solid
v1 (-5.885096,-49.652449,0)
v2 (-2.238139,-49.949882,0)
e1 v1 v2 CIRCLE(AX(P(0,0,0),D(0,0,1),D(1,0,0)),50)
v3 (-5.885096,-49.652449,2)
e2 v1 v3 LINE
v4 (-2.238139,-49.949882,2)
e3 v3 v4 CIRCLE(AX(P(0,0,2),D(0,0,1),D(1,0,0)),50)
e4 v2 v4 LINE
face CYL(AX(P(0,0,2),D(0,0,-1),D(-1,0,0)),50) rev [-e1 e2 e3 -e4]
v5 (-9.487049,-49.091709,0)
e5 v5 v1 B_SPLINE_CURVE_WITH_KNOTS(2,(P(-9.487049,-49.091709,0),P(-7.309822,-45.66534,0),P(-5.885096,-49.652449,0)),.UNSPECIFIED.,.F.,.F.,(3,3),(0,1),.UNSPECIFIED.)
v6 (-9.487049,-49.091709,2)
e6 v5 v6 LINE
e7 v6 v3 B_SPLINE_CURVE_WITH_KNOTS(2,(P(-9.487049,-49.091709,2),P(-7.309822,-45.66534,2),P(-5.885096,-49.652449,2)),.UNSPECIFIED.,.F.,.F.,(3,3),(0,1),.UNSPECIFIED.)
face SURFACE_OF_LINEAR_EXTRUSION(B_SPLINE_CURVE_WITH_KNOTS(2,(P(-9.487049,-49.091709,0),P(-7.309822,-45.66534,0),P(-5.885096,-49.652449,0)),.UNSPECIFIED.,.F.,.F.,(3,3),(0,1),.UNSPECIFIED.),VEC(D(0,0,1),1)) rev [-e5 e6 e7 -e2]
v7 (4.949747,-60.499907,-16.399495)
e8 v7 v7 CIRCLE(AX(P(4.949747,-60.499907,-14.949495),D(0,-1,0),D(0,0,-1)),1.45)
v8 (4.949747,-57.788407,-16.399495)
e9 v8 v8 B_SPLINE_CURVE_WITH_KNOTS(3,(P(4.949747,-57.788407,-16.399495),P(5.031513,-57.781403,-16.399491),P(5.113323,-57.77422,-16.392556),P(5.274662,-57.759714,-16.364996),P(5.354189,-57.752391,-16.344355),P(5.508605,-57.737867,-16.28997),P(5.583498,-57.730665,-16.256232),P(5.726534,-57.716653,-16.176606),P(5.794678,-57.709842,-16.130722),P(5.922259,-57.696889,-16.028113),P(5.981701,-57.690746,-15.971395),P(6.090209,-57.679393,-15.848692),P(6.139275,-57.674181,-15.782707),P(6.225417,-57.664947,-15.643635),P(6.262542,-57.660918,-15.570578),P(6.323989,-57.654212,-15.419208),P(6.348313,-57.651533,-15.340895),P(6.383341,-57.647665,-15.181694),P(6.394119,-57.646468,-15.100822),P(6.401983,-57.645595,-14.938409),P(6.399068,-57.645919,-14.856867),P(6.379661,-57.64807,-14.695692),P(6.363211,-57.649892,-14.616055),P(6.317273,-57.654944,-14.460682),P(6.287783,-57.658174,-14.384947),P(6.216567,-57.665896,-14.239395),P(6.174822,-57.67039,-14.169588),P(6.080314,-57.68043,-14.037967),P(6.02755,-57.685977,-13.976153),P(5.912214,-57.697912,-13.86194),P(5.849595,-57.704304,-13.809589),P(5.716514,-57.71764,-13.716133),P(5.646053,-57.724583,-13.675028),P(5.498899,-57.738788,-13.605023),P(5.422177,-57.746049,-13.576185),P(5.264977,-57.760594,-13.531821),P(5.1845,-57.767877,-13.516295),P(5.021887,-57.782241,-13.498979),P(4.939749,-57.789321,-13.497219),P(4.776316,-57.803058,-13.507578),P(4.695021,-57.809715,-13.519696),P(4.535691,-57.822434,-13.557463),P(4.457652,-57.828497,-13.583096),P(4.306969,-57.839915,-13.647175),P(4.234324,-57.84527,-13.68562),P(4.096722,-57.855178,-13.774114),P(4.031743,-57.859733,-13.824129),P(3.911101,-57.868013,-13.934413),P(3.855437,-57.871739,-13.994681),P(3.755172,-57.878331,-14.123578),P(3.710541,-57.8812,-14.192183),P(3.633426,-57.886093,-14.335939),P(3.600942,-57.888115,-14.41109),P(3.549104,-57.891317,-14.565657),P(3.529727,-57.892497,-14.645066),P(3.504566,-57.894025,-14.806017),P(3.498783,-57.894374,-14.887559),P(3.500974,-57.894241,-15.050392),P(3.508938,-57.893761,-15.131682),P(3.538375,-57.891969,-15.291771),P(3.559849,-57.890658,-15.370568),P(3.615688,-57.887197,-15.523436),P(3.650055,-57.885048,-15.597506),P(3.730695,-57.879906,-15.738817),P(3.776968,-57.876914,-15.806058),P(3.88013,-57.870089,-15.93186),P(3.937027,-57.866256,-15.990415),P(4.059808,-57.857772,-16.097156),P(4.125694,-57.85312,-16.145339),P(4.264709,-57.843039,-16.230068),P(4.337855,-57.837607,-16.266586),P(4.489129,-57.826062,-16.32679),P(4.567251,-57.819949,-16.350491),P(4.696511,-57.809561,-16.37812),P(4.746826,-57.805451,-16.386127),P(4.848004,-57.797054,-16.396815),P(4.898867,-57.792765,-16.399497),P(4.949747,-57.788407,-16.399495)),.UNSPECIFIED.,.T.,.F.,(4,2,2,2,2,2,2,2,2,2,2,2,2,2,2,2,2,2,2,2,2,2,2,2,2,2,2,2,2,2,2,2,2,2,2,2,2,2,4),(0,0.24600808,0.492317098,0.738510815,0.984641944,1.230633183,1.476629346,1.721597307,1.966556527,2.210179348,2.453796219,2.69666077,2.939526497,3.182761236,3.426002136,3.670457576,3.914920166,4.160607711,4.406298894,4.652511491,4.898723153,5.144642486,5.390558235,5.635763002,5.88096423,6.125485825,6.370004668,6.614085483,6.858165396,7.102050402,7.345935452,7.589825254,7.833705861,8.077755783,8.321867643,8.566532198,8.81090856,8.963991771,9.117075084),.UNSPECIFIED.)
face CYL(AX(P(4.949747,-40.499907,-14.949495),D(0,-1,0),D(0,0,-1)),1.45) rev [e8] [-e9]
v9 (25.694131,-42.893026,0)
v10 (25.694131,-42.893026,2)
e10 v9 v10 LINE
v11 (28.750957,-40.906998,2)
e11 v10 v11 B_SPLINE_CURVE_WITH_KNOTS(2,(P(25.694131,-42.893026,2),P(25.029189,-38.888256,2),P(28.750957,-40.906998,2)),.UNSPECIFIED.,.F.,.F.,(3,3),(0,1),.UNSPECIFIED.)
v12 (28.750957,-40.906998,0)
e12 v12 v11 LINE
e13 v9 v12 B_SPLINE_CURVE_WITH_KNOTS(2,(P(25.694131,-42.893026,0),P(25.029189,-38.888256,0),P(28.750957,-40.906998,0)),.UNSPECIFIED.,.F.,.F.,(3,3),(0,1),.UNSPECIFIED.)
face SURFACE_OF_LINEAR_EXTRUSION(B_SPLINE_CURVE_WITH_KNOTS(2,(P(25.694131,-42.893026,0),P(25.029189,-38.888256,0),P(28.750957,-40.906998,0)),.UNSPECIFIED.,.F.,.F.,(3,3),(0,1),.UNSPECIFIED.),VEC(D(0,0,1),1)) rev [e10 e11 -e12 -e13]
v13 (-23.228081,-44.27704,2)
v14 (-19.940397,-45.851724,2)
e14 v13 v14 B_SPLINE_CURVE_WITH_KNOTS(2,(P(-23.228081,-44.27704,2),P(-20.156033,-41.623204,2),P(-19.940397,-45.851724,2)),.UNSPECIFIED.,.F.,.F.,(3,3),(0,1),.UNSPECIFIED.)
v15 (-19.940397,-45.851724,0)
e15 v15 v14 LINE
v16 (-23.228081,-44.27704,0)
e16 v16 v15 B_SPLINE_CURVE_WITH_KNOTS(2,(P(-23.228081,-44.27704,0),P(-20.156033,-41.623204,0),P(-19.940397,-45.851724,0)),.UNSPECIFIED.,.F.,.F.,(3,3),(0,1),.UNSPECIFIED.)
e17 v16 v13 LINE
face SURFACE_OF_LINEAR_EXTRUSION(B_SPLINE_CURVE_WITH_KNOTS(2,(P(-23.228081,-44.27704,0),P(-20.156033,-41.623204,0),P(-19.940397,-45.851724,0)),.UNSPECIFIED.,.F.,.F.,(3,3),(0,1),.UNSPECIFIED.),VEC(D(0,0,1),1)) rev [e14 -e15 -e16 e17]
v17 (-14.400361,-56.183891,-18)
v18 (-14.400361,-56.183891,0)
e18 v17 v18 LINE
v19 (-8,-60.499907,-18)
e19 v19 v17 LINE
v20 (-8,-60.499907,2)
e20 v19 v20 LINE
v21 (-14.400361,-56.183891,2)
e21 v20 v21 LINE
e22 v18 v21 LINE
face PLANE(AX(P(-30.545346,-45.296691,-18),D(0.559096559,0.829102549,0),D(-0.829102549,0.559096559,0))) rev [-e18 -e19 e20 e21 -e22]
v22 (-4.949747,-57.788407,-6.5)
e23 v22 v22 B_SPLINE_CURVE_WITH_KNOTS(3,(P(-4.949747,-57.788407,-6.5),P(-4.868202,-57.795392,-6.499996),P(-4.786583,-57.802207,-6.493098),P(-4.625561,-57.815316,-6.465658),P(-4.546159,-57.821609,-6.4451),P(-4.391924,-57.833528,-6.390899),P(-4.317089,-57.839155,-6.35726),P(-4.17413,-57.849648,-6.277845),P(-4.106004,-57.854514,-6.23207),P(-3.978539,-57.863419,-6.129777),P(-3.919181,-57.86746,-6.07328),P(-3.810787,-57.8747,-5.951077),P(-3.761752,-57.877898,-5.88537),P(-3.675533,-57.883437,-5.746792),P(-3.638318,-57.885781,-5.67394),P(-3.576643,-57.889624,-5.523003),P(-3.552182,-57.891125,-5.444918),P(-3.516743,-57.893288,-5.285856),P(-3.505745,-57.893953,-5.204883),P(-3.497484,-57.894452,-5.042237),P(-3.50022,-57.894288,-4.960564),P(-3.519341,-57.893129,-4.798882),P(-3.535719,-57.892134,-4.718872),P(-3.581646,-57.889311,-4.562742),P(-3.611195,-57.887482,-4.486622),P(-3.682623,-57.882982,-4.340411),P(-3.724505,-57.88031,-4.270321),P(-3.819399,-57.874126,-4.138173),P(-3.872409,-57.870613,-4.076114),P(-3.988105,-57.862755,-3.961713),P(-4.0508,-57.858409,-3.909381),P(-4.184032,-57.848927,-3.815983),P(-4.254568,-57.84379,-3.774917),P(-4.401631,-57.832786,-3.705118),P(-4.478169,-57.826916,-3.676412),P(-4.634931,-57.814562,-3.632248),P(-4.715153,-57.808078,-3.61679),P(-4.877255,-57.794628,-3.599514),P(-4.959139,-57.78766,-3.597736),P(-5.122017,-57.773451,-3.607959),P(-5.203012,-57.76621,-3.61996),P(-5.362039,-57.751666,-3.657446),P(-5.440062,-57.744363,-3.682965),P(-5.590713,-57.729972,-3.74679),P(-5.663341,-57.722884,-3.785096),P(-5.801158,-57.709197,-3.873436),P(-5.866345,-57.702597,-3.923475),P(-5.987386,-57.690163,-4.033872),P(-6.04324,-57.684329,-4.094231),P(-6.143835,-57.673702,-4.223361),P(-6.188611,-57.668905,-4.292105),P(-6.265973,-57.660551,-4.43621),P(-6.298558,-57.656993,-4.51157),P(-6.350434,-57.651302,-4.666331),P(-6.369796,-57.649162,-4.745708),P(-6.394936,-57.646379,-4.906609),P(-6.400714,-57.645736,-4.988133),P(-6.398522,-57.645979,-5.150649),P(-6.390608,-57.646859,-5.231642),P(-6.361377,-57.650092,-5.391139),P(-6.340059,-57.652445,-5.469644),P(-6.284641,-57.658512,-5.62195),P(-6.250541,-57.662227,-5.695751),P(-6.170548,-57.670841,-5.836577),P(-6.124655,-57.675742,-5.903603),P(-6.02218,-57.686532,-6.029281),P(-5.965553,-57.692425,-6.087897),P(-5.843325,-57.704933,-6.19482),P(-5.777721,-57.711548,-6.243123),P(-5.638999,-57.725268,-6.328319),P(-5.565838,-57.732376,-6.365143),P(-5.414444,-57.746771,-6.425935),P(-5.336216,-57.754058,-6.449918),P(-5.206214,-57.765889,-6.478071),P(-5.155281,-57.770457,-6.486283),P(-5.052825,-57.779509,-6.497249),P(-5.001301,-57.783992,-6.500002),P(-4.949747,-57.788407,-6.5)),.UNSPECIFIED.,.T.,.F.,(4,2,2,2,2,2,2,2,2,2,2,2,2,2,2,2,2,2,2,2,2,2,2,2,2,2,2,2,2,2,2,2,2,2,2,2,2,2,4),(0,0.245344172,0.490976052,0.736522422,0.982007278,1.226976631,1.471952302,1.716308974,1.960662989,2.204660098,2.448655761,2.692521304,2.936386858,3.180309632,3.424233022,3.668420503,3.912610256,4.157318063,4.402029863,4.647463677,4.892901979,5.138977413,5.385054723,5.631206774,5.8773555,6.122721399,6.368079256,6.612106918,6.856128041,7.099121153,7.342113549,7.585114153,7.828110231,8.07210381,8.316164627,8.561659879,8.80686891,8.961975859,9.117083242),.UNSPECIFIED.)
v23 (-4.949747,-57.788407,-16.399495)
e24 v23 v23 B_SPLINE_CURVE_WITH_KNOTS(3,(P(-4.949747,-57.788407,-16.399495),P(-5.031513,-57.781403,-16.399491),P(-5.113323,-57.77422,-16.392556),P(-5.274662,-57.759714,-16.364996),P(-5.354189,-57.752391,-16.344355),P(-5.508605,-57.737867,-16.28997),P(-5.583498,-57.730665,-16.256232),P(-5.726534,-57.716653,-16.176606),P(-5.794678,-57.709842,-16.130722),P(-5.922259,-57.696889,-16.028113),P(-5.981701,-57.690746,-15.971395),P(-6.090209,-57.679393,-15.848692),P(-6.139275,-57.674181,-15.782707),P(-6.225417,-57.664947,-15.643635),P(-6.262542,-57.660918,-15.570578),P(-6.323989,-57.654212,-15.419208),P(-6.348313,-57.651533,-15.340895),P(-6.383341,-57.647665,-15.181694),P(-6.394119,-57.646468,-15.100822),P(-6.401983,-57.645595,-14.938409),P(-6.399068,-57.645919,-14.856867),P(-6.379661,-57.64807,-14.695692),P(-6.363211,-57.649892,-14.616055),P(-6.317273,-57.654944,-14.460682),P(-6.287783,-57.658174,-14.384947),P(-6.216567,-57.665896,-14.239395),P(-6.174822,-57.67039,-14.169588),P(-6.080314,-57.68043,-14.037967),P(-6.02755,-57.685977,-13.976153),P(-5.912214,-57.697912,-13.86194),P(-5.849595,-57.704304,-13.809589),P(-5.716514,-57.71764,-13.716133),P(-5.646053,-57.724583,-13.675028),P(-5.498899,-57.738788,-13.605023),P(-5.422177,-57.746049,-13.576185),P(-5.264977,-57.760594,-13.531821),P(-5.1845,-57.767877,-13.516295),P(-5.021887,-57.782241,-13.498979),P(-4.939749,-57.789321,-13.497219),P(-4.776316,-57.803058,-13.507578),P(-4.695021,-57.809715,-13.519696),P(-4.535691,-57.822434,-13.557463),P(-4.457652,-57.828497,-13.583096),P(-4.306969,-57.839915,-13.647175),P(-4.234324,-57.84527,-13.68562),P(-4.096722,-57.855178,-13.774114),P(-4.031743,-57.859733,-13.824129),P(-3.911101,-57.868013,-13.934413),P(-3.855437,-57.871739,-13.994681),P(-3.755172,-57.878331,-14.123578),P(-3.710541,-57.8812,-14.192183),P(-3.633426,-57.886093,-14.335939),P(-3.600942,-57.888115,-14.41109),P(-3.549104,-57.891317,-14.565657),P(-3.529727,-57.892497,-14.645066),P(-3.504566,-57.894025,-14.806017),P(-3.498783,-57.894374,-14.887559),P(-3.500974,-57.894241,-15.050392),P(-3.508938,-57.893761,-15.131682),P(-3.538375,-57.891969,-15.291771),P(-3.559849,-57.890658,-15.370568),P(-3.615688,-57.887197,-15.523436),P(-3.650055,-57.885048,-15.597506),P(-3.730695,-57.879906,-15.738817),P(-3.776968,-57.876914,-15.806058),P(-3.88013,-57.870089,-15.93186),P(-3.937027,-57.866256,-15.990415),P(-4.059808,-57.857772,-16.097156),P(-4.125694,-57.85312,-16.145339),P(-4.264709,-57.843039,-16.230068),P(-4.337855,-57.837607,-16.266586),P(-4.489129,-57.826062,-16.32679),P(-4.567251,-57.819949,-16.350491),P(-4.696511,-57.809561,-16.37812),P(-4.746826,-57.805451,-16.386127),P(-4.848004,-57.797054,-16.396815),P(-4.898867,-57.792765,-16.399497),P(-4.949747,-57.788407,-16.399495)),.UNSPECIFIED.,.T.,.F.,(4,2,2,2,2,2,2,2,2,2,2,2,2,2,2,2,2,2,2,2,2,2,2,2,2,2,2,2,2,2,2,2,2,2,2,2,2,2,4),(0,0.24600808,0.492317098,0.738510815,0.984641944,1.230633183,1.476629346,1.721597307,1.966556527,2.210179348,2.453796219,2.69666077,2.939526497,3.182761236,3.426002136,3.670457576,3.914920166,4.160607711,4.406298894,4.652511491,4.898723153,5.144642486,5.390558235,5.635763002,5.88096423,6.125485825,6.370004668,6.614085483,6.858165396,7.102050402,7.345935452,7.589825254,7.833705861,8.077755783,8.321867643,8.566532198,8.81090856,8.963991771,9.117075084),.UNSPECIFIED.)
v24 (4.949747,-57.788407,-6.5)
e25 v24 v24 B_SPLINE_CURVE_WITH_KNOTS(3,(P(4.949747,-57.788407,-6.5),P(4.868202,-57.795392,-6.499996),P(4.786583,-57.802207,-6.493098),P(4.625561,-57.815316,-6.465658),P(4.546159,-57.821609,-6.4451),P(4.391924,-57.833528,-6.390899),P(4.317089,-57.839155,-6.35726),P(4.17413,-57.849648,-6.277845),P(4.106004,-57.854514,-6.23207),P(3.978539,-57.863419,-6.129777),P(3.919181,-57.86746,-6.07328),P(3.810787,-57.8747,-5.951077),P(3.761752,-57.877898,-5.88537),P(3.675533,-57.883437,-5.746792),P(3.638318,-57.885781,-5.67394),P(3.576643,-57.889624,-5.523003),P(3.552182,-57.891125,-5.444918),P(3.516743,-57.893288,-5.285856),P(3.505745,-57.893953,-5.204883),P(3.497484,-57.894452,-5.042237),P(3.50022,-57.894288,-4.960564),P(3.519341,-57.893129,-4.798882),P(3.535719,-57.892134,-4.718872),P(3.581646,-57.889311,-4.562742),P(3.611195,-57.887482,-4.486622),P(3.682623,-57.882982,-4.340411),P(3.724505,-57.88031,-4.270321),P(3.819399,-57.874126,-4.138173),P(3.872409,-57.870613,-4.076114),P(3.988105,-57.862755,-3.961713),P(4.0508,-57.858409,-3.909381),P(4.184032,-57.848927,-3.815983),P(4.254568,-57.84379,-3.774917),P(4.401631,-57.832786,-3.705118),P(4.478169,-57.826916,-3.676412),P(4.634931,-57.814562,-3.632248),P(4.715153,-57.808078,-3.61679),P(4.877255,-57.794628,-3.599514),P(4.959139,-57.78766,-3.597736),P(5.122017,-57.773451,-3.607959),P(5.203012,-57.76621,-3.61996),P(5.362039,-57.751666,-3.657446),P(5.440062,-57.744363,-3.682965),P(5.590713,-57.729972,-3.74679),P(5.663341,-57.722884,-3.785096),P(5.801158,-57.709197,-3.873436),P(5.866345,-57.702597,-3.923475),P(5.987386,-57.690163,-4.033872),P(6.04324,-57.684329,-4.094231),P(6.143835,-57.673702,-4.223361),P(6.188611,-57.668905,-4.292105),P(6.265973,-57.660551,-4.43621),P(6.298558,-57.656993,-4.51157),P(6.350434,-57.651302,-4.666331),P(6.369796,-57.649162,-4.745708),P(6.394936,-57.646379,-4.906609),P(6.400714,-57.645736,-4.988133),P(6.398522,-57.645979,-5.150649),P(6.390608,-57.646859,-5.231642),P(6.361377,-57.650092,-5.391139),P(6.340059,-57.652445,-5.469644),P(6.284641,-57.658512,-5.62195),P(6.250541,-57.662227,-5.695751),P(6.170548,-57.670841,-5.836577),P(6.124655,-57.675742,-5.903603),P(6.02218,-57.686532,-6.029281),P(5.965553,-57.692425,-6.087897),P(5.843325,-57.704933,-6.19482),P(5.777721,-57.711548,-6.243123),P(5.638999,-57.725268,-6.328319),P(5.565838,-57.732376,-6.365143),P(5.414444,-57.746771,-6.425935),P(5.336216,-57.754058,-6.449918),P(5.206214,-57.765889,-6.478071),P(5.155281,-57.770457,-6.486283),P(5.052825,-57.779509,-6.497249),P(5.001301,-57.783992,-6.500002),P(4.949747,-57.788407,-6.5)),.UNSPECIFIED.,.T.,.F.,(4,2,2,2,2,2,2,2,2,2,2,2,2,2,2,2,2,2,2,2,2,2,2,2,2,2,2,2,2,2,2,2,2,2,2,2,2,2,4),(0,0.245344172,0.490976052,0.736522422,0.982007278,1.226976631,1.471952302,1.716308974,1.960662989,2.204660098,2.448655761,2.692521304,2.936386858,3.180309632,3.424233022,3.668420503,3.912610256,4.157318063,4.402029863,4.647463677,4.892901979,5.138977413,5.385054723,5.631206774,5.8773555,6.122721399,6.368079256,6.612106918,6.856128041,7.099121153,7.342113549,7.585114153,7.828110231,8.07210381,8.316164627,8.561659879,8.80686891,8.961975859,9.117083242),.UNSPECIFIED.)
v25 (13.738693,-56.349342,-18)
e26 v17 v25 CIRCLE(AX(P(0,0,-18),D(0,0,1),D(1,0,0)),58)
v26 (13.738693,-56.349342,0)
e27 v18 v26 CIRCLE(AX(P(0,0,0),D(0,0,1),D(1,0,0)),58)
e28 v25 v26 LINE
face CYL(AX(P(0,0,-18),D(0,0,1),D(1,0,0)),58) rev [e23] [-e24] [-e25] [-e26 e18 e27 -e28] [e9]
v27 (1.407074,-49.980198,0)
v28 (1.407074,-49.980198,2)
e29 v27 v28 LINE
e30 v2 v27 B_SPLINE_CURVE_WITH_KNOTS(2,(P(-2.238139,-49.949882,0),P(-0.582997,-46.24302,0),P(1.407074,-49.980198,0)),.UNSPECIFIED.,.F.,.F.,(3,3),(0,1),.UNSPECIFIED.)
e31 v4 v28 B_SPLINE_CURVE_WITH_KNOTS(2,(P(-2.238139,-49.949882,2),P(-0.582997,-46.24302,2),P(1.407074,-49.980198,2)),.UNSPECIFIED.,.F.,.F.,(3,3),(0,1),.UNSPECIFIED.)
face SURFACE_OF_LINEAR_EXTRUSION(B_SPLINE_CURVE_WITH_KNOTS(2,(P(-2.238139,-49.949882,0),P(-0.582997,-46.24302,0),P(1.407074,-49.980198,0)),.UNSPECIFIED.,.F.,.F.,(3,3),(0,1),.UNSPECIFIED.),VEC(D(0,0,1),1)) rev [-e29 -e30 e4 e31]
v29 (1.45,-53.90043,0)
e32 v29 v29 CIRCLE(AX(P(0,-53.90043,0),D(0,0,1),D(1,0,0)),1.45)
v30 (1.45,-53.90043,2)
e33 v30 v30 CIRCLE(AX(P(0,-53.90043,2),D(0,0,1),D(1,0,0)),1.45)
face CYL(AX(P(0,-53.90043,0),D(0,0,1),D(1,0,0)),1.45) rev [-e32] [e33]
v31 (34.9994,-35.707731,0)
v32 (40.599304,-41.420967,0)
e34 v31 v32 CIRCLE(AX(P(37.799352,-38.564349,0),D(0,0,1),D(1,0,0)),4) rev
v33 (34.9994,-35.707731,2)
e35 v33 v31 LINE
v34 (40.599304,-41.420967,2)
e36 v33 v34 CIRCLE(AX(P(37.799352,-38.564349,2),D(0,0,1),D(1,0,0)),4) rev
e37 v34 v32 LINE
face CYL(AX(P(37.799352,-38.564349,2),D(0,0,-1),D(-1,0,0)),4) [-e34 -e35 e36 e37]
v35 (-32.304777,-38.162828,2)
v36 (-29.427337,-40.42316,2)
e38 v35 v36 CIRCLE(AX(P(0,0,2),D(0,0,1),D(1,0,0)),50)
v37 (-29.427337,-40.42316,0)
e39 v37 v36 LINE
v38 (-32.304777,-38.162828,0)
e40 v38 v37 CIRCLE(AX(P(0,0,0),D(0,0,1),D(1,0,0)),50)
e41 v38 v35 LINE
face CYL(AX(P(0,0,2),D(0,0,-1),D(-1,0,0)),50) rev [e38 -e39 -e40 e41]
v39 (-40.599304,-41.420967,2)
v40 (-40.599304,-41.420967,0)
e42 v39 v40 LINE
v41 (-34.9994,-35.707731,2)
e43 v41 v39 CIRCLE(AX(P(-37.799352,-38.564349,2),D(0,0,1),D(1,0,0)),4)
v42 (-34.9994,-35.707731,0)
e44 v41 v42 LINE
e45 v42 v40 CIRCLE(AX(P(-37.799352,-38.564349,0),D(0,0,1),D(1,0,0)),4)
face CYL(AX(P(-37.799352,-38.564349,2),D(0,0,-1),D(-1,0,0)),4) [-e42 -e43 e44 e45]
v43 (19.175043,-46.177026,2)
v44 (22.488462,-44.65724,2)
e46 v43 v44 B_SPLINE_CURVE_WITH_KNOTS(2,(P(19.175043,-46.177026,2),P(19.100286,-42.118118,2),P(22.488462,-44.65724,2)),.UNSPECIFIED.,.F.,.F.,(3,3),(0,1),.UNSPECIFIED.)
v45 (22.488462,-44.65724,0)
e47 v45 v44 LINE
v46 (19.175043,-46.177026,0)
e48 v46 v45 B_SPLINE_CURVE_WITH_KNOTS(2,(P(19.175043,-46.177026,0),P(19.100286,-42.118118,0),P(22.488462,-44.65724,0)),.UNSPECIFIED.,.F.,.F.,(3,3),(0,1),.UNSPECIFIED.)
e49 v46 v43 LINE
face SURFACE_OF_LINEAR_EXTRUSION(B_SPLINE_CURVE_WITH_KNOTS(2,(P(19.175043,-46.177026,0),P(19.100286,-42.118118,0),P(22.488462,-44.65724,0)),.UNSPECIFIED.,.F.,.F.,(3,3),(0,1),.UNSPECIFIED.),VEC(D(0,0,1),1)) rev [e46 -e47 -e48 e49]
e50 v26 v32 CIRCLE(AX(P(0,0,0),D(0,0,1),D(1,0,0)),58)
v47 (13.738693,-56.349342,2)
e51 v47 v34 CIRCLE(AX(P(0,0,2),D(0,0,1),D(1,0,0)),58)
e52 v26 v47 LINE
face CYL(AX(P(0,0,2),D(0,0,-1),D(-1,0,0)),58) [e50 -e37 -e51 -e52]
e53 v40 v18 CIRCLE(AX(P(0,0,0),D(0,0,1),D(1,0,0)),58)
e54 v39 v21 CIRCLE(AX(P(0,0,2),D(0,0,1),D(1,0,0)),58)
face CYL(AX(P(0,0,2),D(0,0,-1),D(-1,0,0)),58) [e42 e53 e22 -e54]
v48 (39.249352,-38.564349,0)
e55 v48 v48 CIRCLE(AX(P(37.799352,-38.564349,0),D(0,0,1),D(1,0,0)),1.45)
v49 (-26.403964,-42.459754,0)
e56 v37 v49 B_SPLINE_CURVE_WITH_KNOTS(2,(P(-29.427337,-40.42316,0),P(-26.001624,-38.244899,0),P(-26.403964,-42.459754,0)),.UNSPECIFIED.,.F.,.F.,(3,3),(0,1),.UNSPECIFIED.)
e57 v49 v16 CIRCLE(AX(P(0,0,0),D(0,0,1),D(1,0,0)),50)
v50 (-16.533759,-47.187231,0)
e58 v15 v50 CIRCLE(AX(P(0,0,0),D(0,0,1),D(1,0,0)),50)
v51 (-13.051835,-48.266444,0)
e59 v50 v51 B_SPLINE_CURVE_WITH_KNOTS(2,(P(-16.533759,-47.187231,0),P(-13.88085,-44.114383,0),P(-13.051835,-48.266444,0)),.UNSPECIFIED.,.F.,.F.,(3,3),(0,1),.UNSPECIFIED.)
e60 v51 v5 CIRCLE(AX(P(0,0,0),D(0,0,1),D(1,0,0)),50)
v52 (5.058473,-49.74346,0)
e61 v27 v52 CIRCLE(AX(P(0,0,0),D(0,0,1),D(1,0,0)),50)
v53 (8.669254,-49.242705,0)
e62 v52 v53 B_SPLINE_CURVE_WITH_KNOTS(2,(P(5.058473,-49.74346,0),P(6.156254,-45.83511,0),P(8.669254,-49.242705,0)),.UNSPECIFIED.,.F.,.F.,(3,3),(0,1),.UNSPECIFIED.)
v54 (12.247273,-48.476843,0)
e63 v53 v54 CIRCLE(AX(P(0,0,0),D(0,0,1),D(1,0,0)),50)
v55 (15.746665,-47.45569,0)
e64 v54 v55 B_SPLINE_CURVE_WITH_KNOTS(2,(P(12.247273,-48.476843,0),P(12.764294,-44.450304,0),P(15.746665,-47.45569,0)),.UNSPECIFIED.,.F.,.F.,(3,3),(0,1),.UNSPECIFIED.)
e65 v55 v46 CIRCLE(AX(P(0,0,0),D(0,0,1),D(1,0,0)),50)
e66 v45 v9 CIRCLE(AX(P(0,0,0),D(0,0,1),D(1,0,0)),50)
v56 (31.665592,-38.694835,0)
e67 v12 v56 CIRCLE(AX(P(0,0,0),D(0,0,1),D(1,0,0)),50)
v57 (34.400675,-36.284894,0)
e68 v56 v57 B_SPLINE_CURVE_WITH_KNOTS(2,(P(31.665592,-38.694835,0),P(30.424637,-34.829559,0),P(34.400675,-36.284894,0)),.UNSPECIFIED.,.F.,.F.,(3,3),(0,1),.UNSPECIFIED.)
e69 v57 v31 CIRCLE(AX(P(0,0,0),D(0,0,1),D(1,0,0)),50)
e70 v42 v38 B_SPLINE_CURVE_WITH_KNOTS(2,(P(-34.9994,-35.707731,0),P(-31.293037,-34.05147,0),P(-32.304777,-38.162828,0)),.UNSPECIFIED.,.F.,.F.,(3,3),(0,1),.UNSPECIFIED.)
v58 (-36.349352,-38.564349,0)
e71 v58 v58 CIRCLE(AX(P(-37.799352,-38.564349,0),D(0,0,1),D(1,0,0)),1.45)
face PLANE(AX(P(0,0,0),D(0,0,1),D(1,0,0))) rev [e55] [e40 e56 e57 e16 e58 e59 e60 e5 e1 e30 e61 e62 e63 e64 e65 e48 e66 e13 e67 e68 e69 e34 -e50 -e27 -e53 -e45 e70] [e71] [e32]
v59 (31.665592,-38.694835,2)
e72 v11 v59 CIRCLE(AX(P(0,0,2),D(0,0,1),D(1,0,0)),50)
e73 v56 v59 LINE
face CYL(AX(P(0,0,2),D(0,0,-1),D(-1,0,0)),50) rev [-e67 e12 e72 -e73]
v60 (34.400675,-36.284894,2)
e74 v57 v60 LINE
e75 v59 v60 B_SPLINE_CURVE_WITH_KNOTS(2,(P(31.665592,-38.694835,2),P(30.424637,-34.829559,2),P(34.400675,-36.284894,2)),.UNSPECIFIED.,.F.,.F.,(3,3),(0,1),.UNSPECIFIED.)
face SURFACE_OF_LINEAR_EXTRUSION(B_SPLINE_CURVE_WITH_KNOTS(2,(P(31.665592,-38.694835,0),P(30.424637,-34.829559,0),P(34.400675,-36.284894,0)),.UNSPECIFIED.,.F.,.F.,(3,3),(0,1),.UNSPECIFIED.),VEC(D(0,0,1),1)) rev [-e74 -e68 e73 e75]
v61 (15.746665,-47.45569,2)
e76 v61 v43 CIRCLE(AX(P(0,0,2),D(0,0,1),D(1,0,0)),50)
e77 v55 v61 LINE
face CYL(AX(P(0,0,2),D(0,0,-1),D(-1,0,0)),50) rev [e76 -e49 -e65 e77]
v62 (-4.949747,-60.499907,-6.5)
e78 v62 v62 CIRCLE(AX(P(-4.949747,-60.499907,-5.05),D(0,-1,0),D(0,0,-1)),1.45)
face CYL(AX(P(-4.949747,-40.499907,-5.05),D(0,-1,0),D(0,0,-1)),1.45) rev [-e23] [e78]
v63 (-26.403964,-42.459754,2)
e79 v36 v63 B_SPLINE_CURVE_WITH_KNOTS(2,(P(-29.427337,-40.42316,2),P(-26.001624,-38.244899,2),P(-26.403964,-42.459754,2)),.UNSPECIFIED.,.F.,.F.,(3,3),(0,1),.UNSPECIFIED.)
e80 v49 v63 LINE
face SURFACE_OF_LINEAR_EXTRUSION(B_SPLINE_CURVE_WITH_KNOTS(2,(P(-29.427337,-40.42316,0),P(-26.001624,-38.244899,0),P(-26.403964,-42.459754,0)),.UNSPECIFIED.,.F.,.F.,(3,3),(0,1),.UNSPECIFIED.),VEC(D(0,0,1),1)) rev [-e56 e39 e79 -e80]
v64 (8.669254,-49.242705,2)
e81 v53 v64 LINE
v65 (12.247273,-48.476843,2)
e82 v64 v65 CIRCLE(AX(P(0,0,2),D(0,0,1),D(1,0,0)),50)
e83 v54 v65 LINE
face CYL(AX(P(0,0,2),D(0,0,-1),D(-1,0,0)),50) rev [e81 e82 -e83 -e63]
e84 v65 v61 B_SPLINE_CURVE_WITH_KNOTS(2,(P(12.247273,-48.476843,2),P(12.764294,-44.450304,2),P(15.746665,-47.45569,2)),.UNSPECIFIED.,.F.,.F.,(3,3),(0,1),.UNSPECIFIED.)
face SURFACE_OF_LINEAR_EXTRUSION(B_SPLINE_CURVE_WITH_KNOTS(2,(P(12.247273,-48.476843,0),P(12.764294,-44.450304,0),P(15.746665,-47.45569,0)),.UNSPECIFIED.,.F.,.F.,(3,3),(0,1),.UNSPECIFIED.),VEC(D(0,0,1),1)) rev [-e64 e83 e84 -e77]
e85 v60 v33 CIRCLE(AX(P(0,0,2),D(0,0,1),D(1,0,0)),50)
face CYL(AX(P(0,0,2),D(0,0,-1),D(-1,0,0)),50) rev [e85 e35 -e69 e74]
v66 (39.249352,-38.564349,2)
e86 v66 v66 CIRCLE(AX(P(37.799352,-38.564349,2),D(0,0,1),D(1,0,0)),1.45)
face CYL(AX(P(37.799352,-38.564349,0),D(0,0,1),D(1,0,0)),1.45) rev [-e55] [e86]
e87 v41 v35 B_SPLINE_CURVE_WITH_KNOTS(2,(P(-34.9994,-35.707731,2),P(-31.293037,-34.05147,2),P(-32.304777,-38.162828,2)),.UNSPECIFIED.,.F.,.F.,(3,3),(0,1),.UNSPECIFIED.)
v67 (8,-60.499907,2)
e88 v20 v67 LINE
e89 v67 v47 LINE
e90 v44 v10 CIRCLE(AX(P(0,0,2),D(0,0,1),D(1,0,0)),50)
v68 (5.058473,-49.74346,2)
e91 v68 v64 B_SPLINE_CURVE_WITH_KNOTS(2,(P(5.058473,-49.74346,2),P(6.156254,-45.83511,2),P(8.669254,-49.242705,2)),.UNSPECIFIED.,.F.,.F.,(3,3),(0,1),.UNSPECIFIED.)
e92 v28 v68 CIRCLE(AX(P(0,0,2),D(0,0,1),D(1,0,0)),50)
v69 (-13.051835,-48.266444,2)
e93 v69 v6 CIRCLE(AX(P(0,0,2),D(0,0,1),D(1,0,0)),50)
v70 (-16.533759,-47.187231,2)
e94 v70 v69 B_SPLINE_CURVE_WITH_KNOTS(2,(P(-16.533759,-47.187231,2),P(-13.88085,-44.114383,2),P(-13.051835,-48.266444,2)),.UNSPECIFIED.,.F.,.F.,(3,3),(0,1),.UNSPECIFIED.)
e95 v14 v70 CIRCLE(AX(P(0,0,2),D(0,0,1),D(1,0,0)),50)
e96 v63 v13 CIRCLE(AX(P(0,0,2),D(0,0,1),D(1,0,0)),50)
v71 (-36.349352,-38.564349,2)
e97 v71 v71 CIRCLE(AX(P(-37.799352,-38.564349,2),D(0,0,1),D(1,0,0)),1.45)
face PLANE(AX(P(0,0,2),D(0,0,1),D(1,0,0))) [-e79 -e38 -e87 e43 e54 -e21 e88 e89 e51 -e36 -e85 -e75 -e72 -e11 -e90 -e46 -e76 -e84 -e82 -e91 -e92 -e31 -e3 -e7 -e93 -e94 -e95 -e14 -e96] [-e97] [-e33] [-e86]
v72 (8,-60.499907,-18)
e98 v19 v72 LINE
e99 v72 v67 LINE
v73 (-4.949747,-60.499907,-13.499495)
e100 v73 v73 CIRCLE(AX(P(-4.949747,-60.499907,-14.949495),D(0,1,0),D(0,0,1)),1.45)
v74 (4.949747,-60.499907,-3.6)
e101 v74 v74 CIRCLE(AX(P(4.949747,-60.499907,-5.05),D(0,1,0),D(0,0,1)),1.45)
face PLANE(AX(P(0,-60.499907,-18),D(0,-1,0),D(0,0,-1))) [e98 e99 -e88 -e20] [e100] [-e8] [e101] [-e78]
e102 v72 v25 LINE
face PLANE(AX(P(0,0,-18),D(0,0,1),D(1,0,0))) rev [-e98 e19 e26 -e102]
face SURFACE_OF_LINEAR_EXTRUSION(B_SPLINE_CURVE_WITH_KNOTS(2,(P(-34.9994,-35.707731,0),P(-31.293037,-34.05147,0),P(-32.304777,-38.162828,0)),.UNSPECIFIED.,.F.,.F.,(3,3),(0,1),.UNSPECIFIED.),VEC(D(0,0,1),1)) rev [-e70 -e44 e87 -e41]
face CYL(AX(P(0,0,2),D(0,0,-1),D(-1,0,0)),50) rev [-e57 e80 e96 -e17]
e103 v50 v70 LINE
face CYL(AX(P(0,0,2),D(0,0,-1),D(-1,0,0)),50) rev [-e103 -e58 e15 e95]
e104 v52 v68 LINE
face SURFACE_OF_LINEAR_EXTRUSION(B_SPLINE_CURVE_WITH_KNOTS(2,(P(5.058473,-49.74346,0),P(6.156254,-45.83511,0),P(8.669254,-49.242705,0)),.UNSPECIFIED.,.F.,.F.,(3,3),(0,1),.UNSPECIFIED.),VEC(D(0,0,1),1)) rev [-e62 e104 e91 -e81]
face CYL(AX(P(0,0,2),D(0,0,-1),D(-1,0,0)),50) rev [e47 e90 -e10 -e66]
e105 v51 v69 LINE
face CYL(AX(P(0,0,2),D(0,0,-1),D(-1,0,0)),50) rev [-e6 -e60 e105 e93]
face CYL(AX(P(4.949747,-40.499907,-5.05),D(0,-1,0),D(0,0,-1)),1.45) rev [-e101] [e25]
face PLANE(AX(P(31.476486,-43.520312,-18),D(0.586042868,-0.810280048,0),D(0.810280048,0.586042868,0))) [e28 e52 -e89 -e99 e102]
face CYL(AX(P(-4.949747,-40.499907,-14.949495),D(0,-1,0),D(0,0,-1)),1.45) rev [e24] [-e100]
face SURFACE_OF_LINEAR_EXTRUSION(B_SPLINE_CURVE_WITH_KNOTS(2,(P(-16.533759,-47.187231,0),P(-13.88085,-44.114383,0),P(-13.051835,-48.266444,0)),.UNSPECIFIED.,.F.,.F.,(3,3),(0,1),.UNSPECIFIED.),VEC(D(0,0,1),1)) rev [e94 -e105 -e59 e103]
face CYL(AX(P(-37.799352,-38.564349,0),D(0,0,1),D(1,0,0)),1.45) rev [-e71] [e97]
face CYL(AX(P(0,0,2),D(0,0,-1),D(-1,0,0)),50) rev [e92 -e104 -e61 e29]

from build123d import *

# Parameters (mm, degrees)
EXTRUDE_1_DEPTH     = 2
EXTRUDE_START       = -2
EXTRUDE_6_DEPTH     = 2
SKETCH_3_R          = 1.45
CUT_EXTRUDE_1_DEPTH = 2
EXTRUDE_START_2     = -20
EXTRUDE_7_DEPTH     = 20
SKETCH_6_R          = 1.45
CUT_EXTRUDE_2_DEPTH = 20


with BuildPart() as part:
    # 草图1 → 凸台-拉伸1 (new body)
    with BuildSketch(Plane.XY):
        with BuildLine():
            ThreePointArc((34.999399669, -35.707730574), (0, -50), (-34.999399669, -35.707730574))
            ThreePointArc((-34.999399669, -35.707730574), (-40.655970089, -35.764397047), (-40.599303617, -41.420967466))
            ThreePointArc((-40.599303617, -41.420967466), (0, -58), (40.599303617, -41.420967466))
            ThreePointArc((40.599303617, -41.420967466), (40.655970089, -35.764397047), (34.999399669, -35.707730574))
        make_face()
    extrude(amount=EXTRUDE_1_DEPTH)

    # 草图2 → 凸台-拉伸6 (add)
    with BuildSketch(Plane.XY.offset(2).offset(EXTRUDE_START)):
        with BuildLine():
            add(Edge.make_bspline(
                [(-34.999399669, -35.707730574), (-31.293036679, -34.051470167), (-32.304776642, -38.162827543)],
                knots=[0, 0, 0, 1, 1, 1], degree=2))
            ThreePointArc((-34.999399669, -35.707730574), (-33.674469744, -36.959844257), (-32.304776642, -38.162827543))
        make_face()
        with BuildLine():
            add(Edge.make_bspline(
                [(31.66559238, -38.694835046), (30.424637319, -34.829559417), (34.400675338, -36.284894051)],
                knots=[0, 0, 0, 1, 1, 1], degree=2))
            ThreePointArc((31.66559238, -38.694835046), (33.055103788, -37.514798594), (34.400675338, -36.284894051))
        make_face()
        with BuildLine():
            add(Edge.make_bspline(
                [(25.69413065, -42.893025659), (25.029188635, -38.888256343), (28.750957058, -40.906997791)],
                knots=[0, 0, 0, 1, 1, 1], degree=2))
            ThreePointArc((25.69413065, -42.893025659), (27.240649231, -41.927878905), (28.750957058, -40.906997791))
        make_face()
        with BuildLine():
            add(Edge.make_bspline(
                [(19.175043133, -46.177025899), (19.100286249, -42.118117602), (22.488462044, -44.657239893)],
                knots=[0, 0, 0, 1, 1, 1], degree=2))
            ThreePointArc((19.175043133, -46.177025899), (20.84560753, -45.44733927), (22.488462044, -44.657239893))
        make_face()
        with BuildLine():
            add(Edge.make_bspline(
                [(12.247272863, -48.476843002), (12.764294423, -44.450304307), (15.746664505, -47.455690459)],
                knots=[0, 0, 0, 1, 1, 1], degree=2))
            ThreePointArc((12.247272863, -48.476843002), (14.006277895, -47.998168502), (15.746664505, -47.455690459))
        make_face()
        with BuildLine():
            add(Edge.make_bspline(
                [(5.058473235, -49.743460359), (6.156253823, -45.835109949), (8.669254151, -49.242705373)],
                knots=[0, 0, 0, 1, 1, 1], degree=2))
            ThreePointArc((5.058473235, -49.743460359), (6.868428764, -49.526000104), (8.669254151, -49.242705373))
        make_face()
        with BuildLine():
            add(Edge.make_bspline(
                [(-2.238138968, -49.949882222), (-0.58299664, -46.243019798), (1.407073696, -49.980197515)],
                knots=[0, 0, 0, 1, 1, 1], degree=2))
            ThreePointArc((-2.238138968, -49.949882222), (-0.415809002, -49.998270999), (1.407073696, -49.980197515))
        make_face()
        with BuildLine():
            add(Edge.make_bspline(
                [(-9.487049125, -49.091709065), (-7.309821542, -45.665339966), (-5.885096092, -49.65244852)],
                knots=[0, 0, 0, 1, 1, 1], degree=2))
            ThreePointArc((-9.487049125, -49.091709065), (-7.69118452, -49.404915552), (-5.885096092, -49.65244852))
        make_face()
        with BuildLine():
            add(Edge.make_bspline(
                [(-16.5337593, -47.18723136), (-13.880850288, -44.114382693), (-13.051835275, -48.266443788)],
                knots=[0, 0, 0, 1, 1, 1], degree=2))
            ThreePointArc((-16.5337593, -47.18723136), (-14.802635794, -47.758580104), (-13.051835275, -48.266443788))
        make_face()
        with BuildLine():
            add(Edge.make_bspline(
                [(-23.228081101, -44.277039743), (-20.15603281, -41.623203943), (-19.940397248, -45.851723605)],
                knots=[0, 0, 0, 1, 1, 1], degree=2))
            ThreePointArc((-23.228081101, -44.277039743), (-21.598594585, -45.094353437), (-19.940397248, -45.851723605))
        make_face()
        with BuildLine():
            add(Edge.make_bspline(
                [(-29.427336681, -40.423159895), (-26.001624486, -38.244898865), (-26.403964274, -42.459753539)],
                knots=[0, 0, 0, 1, 1, 1], degree=2))
            ThreePointArc((-29.427336681, -40.423159895), (-27.934216832, -41.469018918), (-26.403964274, -42.459753539))
        make_face()
    extrude(amount=EXTRUDE_6_DEPTH)

    # 草图3 → 切除-拉伸1 (cut)
    with BuildSketch(Plane.XY.offset(2)):
        with Locations((-37.799351643, -38.56434902)):
            Circle(SKETCH_3_R)
        with Locations((37.799351643, -38.56434902)):
            Circle(SKETCH_3_R)
        with Locations((0, -53.900429622)):
            Circle(SKETCH_3_R)
    extrude(amount=-CUT_EXTRUDE_1_DEPTH, mode=Mode.SUBTRACT)

    # 草图5 → 凸台-拉伸7 (add)
    with BuildSketch(Plane.XY.offset(2).offset(EXTRUDE_START_2)):
        with BuildLine():
            Line((-14.400360847, -56.183890996), (-8, -60.499906827))
            Line((-8, -60.499906827), (8, -60.499906827))
            Line((8, -60.499906827), (13.738692935, -56.349341757))
            ThreePointArc((13.738692935, -56.349341757), (-0.341019933, -57.998997452), (-14.400360847, -56.183890996))
        make_face()
    extrude(amount=EXTRUDE_7_DEPTH)

    # 草图6 → 切除-拉伸2 (cut)
    with BuildSketch(Plane.XZ.offset(60.499906827)):
        with Locations((-4.94974747, -5.05)):
            Circle(SKETCH_6_R)
        with Locations((-4.94974747, -14.94949494)):
            Circle(SKETCH_6_R)
        with Locations((4.94974747, -14.94949494)):
            Circle(SKETCH_6_R)
        with Locations((4.94974747, -5.05)):
            Circle(SKETCH_6_R)
    extrude(amount=-CUT_EXTRUDE_2_DEPTH, mode=Mode.SUBTRACT)


solid = part.part
